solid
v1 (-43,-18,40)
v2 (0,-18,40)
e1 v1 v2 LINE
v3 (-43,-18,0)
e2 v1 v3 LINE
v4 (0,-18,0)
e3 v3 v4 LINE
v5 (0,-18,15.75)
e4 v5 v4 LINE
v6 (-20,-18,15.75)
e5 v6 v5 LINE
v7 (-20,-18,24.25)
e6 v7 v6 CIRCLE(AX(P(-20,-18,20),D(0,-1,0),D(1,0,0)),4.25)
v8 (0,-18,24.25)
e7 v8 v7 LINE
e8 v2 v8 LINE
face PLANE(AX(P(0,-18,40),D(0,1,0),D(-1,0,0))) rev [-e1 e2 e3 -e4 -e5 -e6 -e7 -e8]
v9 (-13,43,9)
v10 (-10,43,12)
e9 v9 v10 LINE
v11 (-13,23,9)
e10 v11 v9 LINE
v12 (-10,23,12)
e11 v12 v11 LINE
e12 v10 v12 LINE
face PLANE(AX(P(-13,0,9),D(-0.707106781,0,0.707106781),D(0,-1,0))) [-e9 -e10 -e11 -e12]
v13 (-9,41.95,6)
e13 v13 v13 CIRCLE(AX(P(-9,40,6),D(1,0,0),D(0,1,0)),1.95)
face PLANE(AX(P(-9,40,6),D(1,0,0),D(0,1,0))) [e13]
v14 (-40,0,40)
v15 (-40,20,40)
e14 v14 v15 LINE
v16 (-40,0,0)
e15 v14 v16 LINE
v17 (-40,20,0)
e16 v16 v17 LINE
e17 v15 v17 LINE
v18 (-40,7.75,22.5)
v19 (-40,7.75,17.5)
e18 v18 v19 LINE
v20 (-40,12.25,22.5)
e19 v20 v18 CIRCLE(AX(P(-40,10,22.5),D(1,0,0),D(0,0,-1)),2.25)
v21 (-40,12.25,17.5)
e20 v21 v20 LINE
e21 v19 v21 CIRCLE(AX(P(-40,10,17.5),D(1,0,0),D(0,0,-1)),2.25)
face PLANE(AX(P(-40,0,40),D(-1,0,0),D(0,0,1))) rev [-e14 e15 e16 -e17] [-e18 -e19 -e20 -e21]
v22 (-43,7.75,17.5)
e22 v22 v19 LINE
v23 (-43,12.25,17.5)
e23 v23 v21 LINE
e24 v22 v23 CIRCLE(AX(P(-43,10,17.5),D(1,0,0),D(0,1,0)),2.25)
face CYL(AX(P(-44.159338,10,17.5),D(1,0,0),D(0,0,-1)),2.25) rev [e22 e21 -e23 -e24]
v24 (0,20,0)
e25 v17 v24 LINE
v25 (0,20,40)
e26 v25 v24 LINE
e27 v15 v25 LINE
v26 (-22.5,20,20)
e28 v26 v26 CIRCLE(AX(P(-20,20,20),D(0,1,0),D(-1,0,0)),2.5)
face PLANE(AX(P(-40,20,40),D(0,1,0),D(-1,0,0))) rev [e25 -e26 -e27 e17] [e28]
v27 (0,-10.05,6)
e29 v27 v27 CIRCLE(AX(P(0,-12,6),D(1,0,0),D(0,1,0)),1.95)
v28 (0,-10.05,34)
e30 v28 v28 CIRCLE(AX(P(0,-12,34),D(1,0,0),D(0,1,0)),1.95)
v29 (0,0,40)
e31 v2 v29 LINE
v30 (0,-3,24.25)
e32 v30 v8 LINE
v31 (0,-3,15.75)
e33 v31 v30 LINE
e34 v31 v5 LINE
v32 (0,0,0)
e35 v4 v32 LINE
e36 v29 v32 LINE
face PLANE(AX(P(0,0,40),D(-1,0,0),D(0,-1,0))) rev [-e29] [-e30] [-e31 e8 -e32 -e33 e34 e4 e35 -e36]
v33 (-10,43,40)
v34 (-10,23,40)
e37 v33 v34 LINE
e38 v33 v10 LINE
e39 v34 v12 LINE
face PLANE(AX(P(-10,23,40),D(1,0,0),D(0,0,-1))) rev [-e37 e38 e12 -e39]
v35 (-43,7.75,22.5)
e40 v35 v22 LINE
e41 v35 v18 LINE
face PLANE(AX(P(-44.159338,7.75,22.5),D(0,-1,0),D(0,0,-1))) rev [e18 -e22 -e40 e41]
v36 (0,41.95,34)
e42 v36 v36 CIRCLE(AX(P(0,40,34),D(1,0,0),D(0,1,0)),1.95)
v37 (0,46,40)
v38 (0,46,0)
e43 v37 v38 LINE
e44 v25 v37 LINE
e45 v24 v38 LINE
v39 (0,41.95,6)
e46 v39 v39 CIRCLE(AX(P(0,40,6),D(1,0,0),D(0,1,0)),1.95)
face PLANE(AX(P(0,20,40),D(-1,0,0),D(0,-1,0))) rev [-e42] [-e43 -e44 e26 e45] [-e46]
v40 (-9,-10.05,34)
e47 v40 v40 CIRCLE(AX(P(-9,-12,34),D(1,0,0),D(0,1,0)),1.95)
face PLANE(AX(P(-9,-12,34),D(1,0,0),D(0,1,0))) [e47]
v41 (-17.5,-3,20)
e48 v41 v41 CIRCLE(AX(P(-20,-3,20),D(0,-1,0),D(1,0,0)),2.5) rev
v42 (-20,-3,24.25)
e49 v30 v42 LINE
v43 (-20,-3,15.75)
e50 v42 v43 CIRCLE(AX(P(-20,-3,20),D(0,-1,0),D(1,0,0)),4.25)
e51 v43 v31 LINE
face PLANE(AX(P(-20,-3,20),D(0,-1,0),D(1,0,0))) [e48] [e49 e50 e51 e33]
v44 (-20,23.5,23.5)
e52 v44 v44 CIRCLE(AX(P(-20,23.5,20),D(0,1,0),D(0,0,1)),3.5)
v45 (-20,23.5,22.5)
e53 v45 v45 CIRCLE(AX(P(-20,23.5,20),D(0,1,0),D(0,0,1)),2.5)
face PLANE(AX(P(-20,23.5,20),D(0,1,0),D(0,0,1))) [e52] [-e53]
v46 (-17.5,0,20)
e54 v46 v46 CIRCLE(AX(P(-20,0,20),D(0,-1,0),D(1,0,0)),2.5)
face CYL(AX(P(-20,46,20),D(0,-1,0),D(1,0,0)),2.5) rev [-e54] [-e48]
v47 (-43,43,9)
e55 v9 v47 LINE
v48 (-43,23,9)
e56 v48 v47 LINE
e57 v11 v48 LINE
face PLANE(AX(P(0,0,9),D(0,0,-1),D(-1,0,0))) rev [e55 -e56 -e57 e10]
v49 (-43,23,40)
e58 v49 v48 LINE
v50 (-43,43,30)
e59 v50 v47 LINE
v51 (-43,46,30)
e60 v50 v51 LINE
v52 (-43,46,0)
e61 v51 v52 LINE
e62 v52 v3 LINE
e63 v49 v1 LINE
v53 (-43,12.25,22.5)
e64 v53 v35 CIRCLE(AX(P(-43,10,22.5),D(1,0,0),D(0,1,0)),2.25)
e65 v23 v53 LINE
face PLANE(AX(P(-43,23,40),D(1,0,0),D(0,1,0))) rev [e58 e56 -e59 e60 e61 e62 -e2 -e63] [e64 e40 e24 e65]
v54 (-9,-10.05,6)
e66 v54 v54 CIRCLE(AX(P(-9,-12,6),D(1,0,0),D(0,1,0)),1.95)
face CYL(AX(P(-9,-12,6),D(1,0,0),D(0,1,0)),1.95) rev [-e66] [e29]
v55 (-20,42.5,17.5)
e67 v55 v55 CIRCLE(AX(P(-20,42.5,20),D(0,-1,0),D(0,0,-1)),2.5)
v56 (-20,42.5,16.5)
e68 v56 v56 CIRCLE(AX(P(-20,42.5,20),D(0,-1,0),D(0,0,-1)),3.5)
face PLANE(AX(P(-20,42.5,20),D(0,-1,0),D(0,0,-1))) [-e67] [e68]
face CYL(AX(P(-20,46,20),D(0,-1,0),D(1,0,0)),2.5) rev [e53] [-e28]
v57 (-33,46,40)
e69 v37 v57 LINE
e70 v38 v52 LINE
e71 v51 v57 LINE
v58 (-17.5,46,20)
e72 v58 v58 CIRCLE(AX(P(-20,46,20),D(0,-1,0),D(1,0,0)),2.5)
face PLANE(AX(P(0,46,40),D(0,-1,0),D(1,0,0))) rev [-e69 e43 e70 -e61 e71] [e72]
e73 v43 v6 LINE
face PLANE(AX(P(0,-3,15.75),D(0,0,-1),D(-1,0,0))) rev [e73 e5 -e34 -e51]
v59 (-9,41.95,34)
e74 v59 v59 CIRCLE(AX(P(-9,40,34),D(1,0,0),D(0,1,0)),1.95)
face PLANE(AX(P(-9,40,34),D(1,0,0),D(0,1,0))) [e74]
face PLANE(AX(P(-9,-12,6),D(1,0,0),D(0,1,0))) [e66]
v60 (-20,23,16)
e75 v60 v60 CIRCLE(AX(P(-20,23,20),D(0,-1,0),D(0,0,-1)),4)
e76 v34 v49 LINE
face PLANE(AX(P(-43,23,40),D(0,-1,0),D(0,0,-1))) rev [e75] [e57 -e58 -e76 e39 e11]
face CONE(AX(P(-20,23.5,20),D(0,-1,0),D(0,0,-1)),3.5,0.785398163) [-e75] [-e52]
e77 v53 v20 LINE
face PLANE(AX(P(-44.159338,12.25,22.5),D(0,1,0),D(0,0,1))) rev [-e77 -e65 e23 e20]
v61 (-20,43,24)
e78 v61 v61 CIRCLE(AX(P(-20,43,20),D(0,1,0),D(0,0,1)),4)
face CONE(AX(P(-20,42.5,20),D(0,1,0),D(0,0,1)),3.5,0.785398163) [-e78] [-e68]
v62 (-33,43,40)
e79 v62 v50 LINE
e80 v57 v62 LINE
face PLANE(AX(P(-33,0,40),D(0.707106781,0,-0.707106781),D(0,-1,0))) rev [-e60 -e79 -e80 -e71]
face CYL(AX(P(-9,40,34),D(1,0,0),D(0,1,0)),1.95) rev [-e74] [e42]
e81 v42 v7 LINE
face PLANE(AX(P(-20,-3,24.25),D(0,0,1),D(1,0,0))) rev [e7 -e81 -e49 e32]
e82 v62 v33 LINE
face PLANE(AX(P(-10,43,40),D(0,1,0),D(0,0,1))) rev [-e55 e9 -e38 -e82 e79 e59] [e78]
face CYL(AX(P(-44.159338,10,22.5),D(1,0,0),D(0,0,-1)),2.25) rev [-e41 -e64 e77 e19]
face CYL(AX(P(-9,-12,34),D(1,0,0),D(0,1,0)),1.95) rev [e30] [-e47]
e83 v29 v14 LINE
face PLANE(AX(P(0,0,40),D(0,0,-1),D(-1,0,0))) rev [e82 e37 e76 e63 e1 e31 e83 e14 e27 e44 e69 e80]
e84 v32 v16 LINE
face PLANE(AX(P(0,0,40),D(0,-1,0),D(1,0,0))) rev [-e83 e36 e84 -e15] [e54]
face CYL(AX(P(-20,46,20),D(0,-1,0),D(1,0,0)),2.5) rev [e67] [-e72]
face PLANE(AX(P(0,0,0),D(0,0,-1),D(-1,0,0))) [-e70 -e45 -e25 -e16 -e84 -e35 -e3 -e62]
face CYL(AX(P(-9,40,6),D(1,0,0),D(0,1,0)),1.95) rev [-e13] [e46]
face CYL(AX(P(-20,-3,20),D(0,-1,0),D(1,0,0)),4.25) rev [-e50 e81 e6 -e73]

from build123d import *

# Parameters (mm, degrees)
BOSS_EXTRUDE1_DEPTH     = 40
CUT_EXTRUDE1_DEPTH      = 70.94998213
CUT_EXTRUDE1_DEPTH_BACK = 70.94998213
SKETCH3_R               = 2.5
CUT_EXTRUDE2_DEPTH      = 15
SKETCH5_R               = 3.5
SKETCH5_R_2             = 2.5
BOSS_EXTRUDE2_DEPTH     = 0.5
BOSS_EXTRUDE3_START     = 0.5
SKETCH6_R               = 3.5
SKETCH6_R_2             = 2.5
BOSS_EXTRUDE3_DEPTH     = 0.5
CHAMFER1_SIZE           = 0.5
CUT_EXTRUDE3_DEPTH      = 4.159338157
SKETCH9_W               = 43
SKETCH9_H               = 23
BOSS_EXTRUDE4_DEPTH     = 9
CHAMFER2_SIZE           = 3
SKETCH8_R               = 1.95
CUT_EXTRUDE4_DEPTH      = 9
CHAMFER5_SIZE           = 10


with BuildPart() as part:
    # Sketch1 → Boss-Extrude1 (new body)
    with BuildSketch(Plane.XY):
        Polygon((0, 0), (-40, 0), (-40, 20), (0, 20), (0, 46), (-43, 46), (-43, 43), (-10, 43), (-10, 23), (-43, 23), (-43, -18), (0, -18), align=None)
    extrude(amount=BOSS_EXTRUDE1_DEPTH)

    # Sketch3 → Cut-Extrude1 (cut, two sides: drawn at the far end of the back side and taken through both)
    with BuildSketch(Plane(origin=(0, 20, 0), x_dir=(-1, 0, 0), z_dir=(0, -1, 0)).offset(-CUT_EXTRUDE1_DEPTH_BACK)):
        with Locations(Location((20, -20, 0), (0, 0, 180))):
            Circle(SKETCH3_R)
    extrude(amount=CUT_EXTRUDE1_DEPTH + CUT_EXTRUDE1_DEPTH_BACK, mode=Mode.SUBTRACT)

    # Sketch4 → Cut-Extrude2 (cut)
    with BuildSketch(Plane(origin=(0, -18, 0), x_dir=(-1, 0, 0), z_dir=(0, -1, 0))):
        with BuildLine():
            Line((20, -24.25), (0, -24.25))
            Line((0, -24.25), (0, -15.75))
            Line((0, -15.75), (20, -15.75))
            ThreePointArc((20, -15.75), (24.25, -20), (20, -24.25))
        make_face()
    extrude(amount=-CUT_EXTRUDE2_DEPTH, mode=Mode.SUBTRACT)

    # Sketch5 → Boss-Extrude2 (add)
    with BuildSketch(Plane(origin=(0, 23, 0), x_dir=(1, 0, 0), z_dir=(0, 1, 0))):
        with Locations(Location((-20, -20, 0), (0, 0, 90))):
            Circle(SKETCH5_R)
        with Locations((-20, -20)):
            Circle(SKETCH5_R_2, mode=Mode.SUBTRACT)
    extrude(amount=BOSS_EXTRUDE2_DEPTH)

    # Sketch6 → Boss-Extrude3 (add)
    with BuildSketch(Plane(origin=(0, 43, 0), x_dir=(-1, 0, 0), z_dir=(0, -1, 0)).offset(BOSS_EXTRUDE3_START)):
        with Locations(Location((20, -20, 0), (0, 0, 90))):
            Circle(SKETCH6_R)
        with Locations(Location((20, -20, 0), (0, 0, 180))):
            Circle(SKETCH6_R_2, mode=Mode.SUBTRACT)
    extrude(amount=-BOSS_EXTRUDE3_DEPTH)

    # Chamfer1
    chamfer1_edges = [part.edges().sort_by_distance(p)[0] for p in [
        (-20, 23, 23.5),
        (-20, 43, 23.5),
    ]]
    chamfer(chamfer1_edges, length=CHAMFER1_SIZE - 0.0001)  # a hair under: the kernel refuses the full size

    # Sketch7 → Cut-Extrude3 (cut)
    with BuildSketch(Plane(origin=(-40, 0, 0), x_dir=(0, 0, -1), z_dir=(1, 0, 0))):
        with BuildLine():
            Line((-22.5, 12.25), (-17.5, 12.25))
            ThreePointArc((-17.5, 12.25), (-15.25, 10), (-17.5, 7.75))
            Line((-17.5, 7.75), (-22.5, 7.75))
            ThreePointArc((-22.5, 7.75), (-24.75, 10), (-22.5, 12.25))
        make_face()
    extrude(amount=-CUT_EXTRUDE3_DEPTH, mode=Mode.SUBTRACT)

    # Sketch9 → Boss-Extrude4 (add)
    with BuildSketch(Plane(origin=(0, 0, 0), x_dir=(-1, 0, 0), z_dir=(0, 0, -1))):
        with Locations((21.5, 34.5)):
            Rectangle(SKETCH9_W, SKETCH9_H)
    extrude(amount=-BOSS_EXTRUDE4_DEPTH)

    # Chamfer2
    chamfer2_edges = [part.edges().sort_by_distance(p)[0] for p in [
        (-10, 33, 9),
    ]]
    chamfer(chamfer2_edges, length=CHAMFER2_SIZE)

    # Sketch8 → Cut-Extrude4 (cut)
    with BuildSketch(Plane(origin=(0, 0, 0), x_dir=(0, 0, -1), z_dir=(1, 0, 0))):
        with Locations(Location((-34, 40, 0), (0, 0, 90))):
            Circle(SKETCH8_R)
        with Locations(Location((-6, 40, 0), (0, 0, 90))):
            Circle(SKETCH8_R)
        with Locations(Location((-34, -12, 0), (0, 0, 90))):
            Circle(SKETCH8_R)
        with Locations(Location((-6, -12, 0), (0, 0, 90))):
            Circle(SKETCH8_R)
    extrude(amount=-CUT_EXTRUDE4_DEPTH, mode=Mode.SUBTRACT)

    # Chamfer5
    chamfer5_edges = [part.edges().sort_by_distance(p)[0] for p in [
        (-43, 44.5, 40),
    ]]
    chamfer(chamfer5_edges, length=CHAMFER5_SIZE)


solid = part.part
